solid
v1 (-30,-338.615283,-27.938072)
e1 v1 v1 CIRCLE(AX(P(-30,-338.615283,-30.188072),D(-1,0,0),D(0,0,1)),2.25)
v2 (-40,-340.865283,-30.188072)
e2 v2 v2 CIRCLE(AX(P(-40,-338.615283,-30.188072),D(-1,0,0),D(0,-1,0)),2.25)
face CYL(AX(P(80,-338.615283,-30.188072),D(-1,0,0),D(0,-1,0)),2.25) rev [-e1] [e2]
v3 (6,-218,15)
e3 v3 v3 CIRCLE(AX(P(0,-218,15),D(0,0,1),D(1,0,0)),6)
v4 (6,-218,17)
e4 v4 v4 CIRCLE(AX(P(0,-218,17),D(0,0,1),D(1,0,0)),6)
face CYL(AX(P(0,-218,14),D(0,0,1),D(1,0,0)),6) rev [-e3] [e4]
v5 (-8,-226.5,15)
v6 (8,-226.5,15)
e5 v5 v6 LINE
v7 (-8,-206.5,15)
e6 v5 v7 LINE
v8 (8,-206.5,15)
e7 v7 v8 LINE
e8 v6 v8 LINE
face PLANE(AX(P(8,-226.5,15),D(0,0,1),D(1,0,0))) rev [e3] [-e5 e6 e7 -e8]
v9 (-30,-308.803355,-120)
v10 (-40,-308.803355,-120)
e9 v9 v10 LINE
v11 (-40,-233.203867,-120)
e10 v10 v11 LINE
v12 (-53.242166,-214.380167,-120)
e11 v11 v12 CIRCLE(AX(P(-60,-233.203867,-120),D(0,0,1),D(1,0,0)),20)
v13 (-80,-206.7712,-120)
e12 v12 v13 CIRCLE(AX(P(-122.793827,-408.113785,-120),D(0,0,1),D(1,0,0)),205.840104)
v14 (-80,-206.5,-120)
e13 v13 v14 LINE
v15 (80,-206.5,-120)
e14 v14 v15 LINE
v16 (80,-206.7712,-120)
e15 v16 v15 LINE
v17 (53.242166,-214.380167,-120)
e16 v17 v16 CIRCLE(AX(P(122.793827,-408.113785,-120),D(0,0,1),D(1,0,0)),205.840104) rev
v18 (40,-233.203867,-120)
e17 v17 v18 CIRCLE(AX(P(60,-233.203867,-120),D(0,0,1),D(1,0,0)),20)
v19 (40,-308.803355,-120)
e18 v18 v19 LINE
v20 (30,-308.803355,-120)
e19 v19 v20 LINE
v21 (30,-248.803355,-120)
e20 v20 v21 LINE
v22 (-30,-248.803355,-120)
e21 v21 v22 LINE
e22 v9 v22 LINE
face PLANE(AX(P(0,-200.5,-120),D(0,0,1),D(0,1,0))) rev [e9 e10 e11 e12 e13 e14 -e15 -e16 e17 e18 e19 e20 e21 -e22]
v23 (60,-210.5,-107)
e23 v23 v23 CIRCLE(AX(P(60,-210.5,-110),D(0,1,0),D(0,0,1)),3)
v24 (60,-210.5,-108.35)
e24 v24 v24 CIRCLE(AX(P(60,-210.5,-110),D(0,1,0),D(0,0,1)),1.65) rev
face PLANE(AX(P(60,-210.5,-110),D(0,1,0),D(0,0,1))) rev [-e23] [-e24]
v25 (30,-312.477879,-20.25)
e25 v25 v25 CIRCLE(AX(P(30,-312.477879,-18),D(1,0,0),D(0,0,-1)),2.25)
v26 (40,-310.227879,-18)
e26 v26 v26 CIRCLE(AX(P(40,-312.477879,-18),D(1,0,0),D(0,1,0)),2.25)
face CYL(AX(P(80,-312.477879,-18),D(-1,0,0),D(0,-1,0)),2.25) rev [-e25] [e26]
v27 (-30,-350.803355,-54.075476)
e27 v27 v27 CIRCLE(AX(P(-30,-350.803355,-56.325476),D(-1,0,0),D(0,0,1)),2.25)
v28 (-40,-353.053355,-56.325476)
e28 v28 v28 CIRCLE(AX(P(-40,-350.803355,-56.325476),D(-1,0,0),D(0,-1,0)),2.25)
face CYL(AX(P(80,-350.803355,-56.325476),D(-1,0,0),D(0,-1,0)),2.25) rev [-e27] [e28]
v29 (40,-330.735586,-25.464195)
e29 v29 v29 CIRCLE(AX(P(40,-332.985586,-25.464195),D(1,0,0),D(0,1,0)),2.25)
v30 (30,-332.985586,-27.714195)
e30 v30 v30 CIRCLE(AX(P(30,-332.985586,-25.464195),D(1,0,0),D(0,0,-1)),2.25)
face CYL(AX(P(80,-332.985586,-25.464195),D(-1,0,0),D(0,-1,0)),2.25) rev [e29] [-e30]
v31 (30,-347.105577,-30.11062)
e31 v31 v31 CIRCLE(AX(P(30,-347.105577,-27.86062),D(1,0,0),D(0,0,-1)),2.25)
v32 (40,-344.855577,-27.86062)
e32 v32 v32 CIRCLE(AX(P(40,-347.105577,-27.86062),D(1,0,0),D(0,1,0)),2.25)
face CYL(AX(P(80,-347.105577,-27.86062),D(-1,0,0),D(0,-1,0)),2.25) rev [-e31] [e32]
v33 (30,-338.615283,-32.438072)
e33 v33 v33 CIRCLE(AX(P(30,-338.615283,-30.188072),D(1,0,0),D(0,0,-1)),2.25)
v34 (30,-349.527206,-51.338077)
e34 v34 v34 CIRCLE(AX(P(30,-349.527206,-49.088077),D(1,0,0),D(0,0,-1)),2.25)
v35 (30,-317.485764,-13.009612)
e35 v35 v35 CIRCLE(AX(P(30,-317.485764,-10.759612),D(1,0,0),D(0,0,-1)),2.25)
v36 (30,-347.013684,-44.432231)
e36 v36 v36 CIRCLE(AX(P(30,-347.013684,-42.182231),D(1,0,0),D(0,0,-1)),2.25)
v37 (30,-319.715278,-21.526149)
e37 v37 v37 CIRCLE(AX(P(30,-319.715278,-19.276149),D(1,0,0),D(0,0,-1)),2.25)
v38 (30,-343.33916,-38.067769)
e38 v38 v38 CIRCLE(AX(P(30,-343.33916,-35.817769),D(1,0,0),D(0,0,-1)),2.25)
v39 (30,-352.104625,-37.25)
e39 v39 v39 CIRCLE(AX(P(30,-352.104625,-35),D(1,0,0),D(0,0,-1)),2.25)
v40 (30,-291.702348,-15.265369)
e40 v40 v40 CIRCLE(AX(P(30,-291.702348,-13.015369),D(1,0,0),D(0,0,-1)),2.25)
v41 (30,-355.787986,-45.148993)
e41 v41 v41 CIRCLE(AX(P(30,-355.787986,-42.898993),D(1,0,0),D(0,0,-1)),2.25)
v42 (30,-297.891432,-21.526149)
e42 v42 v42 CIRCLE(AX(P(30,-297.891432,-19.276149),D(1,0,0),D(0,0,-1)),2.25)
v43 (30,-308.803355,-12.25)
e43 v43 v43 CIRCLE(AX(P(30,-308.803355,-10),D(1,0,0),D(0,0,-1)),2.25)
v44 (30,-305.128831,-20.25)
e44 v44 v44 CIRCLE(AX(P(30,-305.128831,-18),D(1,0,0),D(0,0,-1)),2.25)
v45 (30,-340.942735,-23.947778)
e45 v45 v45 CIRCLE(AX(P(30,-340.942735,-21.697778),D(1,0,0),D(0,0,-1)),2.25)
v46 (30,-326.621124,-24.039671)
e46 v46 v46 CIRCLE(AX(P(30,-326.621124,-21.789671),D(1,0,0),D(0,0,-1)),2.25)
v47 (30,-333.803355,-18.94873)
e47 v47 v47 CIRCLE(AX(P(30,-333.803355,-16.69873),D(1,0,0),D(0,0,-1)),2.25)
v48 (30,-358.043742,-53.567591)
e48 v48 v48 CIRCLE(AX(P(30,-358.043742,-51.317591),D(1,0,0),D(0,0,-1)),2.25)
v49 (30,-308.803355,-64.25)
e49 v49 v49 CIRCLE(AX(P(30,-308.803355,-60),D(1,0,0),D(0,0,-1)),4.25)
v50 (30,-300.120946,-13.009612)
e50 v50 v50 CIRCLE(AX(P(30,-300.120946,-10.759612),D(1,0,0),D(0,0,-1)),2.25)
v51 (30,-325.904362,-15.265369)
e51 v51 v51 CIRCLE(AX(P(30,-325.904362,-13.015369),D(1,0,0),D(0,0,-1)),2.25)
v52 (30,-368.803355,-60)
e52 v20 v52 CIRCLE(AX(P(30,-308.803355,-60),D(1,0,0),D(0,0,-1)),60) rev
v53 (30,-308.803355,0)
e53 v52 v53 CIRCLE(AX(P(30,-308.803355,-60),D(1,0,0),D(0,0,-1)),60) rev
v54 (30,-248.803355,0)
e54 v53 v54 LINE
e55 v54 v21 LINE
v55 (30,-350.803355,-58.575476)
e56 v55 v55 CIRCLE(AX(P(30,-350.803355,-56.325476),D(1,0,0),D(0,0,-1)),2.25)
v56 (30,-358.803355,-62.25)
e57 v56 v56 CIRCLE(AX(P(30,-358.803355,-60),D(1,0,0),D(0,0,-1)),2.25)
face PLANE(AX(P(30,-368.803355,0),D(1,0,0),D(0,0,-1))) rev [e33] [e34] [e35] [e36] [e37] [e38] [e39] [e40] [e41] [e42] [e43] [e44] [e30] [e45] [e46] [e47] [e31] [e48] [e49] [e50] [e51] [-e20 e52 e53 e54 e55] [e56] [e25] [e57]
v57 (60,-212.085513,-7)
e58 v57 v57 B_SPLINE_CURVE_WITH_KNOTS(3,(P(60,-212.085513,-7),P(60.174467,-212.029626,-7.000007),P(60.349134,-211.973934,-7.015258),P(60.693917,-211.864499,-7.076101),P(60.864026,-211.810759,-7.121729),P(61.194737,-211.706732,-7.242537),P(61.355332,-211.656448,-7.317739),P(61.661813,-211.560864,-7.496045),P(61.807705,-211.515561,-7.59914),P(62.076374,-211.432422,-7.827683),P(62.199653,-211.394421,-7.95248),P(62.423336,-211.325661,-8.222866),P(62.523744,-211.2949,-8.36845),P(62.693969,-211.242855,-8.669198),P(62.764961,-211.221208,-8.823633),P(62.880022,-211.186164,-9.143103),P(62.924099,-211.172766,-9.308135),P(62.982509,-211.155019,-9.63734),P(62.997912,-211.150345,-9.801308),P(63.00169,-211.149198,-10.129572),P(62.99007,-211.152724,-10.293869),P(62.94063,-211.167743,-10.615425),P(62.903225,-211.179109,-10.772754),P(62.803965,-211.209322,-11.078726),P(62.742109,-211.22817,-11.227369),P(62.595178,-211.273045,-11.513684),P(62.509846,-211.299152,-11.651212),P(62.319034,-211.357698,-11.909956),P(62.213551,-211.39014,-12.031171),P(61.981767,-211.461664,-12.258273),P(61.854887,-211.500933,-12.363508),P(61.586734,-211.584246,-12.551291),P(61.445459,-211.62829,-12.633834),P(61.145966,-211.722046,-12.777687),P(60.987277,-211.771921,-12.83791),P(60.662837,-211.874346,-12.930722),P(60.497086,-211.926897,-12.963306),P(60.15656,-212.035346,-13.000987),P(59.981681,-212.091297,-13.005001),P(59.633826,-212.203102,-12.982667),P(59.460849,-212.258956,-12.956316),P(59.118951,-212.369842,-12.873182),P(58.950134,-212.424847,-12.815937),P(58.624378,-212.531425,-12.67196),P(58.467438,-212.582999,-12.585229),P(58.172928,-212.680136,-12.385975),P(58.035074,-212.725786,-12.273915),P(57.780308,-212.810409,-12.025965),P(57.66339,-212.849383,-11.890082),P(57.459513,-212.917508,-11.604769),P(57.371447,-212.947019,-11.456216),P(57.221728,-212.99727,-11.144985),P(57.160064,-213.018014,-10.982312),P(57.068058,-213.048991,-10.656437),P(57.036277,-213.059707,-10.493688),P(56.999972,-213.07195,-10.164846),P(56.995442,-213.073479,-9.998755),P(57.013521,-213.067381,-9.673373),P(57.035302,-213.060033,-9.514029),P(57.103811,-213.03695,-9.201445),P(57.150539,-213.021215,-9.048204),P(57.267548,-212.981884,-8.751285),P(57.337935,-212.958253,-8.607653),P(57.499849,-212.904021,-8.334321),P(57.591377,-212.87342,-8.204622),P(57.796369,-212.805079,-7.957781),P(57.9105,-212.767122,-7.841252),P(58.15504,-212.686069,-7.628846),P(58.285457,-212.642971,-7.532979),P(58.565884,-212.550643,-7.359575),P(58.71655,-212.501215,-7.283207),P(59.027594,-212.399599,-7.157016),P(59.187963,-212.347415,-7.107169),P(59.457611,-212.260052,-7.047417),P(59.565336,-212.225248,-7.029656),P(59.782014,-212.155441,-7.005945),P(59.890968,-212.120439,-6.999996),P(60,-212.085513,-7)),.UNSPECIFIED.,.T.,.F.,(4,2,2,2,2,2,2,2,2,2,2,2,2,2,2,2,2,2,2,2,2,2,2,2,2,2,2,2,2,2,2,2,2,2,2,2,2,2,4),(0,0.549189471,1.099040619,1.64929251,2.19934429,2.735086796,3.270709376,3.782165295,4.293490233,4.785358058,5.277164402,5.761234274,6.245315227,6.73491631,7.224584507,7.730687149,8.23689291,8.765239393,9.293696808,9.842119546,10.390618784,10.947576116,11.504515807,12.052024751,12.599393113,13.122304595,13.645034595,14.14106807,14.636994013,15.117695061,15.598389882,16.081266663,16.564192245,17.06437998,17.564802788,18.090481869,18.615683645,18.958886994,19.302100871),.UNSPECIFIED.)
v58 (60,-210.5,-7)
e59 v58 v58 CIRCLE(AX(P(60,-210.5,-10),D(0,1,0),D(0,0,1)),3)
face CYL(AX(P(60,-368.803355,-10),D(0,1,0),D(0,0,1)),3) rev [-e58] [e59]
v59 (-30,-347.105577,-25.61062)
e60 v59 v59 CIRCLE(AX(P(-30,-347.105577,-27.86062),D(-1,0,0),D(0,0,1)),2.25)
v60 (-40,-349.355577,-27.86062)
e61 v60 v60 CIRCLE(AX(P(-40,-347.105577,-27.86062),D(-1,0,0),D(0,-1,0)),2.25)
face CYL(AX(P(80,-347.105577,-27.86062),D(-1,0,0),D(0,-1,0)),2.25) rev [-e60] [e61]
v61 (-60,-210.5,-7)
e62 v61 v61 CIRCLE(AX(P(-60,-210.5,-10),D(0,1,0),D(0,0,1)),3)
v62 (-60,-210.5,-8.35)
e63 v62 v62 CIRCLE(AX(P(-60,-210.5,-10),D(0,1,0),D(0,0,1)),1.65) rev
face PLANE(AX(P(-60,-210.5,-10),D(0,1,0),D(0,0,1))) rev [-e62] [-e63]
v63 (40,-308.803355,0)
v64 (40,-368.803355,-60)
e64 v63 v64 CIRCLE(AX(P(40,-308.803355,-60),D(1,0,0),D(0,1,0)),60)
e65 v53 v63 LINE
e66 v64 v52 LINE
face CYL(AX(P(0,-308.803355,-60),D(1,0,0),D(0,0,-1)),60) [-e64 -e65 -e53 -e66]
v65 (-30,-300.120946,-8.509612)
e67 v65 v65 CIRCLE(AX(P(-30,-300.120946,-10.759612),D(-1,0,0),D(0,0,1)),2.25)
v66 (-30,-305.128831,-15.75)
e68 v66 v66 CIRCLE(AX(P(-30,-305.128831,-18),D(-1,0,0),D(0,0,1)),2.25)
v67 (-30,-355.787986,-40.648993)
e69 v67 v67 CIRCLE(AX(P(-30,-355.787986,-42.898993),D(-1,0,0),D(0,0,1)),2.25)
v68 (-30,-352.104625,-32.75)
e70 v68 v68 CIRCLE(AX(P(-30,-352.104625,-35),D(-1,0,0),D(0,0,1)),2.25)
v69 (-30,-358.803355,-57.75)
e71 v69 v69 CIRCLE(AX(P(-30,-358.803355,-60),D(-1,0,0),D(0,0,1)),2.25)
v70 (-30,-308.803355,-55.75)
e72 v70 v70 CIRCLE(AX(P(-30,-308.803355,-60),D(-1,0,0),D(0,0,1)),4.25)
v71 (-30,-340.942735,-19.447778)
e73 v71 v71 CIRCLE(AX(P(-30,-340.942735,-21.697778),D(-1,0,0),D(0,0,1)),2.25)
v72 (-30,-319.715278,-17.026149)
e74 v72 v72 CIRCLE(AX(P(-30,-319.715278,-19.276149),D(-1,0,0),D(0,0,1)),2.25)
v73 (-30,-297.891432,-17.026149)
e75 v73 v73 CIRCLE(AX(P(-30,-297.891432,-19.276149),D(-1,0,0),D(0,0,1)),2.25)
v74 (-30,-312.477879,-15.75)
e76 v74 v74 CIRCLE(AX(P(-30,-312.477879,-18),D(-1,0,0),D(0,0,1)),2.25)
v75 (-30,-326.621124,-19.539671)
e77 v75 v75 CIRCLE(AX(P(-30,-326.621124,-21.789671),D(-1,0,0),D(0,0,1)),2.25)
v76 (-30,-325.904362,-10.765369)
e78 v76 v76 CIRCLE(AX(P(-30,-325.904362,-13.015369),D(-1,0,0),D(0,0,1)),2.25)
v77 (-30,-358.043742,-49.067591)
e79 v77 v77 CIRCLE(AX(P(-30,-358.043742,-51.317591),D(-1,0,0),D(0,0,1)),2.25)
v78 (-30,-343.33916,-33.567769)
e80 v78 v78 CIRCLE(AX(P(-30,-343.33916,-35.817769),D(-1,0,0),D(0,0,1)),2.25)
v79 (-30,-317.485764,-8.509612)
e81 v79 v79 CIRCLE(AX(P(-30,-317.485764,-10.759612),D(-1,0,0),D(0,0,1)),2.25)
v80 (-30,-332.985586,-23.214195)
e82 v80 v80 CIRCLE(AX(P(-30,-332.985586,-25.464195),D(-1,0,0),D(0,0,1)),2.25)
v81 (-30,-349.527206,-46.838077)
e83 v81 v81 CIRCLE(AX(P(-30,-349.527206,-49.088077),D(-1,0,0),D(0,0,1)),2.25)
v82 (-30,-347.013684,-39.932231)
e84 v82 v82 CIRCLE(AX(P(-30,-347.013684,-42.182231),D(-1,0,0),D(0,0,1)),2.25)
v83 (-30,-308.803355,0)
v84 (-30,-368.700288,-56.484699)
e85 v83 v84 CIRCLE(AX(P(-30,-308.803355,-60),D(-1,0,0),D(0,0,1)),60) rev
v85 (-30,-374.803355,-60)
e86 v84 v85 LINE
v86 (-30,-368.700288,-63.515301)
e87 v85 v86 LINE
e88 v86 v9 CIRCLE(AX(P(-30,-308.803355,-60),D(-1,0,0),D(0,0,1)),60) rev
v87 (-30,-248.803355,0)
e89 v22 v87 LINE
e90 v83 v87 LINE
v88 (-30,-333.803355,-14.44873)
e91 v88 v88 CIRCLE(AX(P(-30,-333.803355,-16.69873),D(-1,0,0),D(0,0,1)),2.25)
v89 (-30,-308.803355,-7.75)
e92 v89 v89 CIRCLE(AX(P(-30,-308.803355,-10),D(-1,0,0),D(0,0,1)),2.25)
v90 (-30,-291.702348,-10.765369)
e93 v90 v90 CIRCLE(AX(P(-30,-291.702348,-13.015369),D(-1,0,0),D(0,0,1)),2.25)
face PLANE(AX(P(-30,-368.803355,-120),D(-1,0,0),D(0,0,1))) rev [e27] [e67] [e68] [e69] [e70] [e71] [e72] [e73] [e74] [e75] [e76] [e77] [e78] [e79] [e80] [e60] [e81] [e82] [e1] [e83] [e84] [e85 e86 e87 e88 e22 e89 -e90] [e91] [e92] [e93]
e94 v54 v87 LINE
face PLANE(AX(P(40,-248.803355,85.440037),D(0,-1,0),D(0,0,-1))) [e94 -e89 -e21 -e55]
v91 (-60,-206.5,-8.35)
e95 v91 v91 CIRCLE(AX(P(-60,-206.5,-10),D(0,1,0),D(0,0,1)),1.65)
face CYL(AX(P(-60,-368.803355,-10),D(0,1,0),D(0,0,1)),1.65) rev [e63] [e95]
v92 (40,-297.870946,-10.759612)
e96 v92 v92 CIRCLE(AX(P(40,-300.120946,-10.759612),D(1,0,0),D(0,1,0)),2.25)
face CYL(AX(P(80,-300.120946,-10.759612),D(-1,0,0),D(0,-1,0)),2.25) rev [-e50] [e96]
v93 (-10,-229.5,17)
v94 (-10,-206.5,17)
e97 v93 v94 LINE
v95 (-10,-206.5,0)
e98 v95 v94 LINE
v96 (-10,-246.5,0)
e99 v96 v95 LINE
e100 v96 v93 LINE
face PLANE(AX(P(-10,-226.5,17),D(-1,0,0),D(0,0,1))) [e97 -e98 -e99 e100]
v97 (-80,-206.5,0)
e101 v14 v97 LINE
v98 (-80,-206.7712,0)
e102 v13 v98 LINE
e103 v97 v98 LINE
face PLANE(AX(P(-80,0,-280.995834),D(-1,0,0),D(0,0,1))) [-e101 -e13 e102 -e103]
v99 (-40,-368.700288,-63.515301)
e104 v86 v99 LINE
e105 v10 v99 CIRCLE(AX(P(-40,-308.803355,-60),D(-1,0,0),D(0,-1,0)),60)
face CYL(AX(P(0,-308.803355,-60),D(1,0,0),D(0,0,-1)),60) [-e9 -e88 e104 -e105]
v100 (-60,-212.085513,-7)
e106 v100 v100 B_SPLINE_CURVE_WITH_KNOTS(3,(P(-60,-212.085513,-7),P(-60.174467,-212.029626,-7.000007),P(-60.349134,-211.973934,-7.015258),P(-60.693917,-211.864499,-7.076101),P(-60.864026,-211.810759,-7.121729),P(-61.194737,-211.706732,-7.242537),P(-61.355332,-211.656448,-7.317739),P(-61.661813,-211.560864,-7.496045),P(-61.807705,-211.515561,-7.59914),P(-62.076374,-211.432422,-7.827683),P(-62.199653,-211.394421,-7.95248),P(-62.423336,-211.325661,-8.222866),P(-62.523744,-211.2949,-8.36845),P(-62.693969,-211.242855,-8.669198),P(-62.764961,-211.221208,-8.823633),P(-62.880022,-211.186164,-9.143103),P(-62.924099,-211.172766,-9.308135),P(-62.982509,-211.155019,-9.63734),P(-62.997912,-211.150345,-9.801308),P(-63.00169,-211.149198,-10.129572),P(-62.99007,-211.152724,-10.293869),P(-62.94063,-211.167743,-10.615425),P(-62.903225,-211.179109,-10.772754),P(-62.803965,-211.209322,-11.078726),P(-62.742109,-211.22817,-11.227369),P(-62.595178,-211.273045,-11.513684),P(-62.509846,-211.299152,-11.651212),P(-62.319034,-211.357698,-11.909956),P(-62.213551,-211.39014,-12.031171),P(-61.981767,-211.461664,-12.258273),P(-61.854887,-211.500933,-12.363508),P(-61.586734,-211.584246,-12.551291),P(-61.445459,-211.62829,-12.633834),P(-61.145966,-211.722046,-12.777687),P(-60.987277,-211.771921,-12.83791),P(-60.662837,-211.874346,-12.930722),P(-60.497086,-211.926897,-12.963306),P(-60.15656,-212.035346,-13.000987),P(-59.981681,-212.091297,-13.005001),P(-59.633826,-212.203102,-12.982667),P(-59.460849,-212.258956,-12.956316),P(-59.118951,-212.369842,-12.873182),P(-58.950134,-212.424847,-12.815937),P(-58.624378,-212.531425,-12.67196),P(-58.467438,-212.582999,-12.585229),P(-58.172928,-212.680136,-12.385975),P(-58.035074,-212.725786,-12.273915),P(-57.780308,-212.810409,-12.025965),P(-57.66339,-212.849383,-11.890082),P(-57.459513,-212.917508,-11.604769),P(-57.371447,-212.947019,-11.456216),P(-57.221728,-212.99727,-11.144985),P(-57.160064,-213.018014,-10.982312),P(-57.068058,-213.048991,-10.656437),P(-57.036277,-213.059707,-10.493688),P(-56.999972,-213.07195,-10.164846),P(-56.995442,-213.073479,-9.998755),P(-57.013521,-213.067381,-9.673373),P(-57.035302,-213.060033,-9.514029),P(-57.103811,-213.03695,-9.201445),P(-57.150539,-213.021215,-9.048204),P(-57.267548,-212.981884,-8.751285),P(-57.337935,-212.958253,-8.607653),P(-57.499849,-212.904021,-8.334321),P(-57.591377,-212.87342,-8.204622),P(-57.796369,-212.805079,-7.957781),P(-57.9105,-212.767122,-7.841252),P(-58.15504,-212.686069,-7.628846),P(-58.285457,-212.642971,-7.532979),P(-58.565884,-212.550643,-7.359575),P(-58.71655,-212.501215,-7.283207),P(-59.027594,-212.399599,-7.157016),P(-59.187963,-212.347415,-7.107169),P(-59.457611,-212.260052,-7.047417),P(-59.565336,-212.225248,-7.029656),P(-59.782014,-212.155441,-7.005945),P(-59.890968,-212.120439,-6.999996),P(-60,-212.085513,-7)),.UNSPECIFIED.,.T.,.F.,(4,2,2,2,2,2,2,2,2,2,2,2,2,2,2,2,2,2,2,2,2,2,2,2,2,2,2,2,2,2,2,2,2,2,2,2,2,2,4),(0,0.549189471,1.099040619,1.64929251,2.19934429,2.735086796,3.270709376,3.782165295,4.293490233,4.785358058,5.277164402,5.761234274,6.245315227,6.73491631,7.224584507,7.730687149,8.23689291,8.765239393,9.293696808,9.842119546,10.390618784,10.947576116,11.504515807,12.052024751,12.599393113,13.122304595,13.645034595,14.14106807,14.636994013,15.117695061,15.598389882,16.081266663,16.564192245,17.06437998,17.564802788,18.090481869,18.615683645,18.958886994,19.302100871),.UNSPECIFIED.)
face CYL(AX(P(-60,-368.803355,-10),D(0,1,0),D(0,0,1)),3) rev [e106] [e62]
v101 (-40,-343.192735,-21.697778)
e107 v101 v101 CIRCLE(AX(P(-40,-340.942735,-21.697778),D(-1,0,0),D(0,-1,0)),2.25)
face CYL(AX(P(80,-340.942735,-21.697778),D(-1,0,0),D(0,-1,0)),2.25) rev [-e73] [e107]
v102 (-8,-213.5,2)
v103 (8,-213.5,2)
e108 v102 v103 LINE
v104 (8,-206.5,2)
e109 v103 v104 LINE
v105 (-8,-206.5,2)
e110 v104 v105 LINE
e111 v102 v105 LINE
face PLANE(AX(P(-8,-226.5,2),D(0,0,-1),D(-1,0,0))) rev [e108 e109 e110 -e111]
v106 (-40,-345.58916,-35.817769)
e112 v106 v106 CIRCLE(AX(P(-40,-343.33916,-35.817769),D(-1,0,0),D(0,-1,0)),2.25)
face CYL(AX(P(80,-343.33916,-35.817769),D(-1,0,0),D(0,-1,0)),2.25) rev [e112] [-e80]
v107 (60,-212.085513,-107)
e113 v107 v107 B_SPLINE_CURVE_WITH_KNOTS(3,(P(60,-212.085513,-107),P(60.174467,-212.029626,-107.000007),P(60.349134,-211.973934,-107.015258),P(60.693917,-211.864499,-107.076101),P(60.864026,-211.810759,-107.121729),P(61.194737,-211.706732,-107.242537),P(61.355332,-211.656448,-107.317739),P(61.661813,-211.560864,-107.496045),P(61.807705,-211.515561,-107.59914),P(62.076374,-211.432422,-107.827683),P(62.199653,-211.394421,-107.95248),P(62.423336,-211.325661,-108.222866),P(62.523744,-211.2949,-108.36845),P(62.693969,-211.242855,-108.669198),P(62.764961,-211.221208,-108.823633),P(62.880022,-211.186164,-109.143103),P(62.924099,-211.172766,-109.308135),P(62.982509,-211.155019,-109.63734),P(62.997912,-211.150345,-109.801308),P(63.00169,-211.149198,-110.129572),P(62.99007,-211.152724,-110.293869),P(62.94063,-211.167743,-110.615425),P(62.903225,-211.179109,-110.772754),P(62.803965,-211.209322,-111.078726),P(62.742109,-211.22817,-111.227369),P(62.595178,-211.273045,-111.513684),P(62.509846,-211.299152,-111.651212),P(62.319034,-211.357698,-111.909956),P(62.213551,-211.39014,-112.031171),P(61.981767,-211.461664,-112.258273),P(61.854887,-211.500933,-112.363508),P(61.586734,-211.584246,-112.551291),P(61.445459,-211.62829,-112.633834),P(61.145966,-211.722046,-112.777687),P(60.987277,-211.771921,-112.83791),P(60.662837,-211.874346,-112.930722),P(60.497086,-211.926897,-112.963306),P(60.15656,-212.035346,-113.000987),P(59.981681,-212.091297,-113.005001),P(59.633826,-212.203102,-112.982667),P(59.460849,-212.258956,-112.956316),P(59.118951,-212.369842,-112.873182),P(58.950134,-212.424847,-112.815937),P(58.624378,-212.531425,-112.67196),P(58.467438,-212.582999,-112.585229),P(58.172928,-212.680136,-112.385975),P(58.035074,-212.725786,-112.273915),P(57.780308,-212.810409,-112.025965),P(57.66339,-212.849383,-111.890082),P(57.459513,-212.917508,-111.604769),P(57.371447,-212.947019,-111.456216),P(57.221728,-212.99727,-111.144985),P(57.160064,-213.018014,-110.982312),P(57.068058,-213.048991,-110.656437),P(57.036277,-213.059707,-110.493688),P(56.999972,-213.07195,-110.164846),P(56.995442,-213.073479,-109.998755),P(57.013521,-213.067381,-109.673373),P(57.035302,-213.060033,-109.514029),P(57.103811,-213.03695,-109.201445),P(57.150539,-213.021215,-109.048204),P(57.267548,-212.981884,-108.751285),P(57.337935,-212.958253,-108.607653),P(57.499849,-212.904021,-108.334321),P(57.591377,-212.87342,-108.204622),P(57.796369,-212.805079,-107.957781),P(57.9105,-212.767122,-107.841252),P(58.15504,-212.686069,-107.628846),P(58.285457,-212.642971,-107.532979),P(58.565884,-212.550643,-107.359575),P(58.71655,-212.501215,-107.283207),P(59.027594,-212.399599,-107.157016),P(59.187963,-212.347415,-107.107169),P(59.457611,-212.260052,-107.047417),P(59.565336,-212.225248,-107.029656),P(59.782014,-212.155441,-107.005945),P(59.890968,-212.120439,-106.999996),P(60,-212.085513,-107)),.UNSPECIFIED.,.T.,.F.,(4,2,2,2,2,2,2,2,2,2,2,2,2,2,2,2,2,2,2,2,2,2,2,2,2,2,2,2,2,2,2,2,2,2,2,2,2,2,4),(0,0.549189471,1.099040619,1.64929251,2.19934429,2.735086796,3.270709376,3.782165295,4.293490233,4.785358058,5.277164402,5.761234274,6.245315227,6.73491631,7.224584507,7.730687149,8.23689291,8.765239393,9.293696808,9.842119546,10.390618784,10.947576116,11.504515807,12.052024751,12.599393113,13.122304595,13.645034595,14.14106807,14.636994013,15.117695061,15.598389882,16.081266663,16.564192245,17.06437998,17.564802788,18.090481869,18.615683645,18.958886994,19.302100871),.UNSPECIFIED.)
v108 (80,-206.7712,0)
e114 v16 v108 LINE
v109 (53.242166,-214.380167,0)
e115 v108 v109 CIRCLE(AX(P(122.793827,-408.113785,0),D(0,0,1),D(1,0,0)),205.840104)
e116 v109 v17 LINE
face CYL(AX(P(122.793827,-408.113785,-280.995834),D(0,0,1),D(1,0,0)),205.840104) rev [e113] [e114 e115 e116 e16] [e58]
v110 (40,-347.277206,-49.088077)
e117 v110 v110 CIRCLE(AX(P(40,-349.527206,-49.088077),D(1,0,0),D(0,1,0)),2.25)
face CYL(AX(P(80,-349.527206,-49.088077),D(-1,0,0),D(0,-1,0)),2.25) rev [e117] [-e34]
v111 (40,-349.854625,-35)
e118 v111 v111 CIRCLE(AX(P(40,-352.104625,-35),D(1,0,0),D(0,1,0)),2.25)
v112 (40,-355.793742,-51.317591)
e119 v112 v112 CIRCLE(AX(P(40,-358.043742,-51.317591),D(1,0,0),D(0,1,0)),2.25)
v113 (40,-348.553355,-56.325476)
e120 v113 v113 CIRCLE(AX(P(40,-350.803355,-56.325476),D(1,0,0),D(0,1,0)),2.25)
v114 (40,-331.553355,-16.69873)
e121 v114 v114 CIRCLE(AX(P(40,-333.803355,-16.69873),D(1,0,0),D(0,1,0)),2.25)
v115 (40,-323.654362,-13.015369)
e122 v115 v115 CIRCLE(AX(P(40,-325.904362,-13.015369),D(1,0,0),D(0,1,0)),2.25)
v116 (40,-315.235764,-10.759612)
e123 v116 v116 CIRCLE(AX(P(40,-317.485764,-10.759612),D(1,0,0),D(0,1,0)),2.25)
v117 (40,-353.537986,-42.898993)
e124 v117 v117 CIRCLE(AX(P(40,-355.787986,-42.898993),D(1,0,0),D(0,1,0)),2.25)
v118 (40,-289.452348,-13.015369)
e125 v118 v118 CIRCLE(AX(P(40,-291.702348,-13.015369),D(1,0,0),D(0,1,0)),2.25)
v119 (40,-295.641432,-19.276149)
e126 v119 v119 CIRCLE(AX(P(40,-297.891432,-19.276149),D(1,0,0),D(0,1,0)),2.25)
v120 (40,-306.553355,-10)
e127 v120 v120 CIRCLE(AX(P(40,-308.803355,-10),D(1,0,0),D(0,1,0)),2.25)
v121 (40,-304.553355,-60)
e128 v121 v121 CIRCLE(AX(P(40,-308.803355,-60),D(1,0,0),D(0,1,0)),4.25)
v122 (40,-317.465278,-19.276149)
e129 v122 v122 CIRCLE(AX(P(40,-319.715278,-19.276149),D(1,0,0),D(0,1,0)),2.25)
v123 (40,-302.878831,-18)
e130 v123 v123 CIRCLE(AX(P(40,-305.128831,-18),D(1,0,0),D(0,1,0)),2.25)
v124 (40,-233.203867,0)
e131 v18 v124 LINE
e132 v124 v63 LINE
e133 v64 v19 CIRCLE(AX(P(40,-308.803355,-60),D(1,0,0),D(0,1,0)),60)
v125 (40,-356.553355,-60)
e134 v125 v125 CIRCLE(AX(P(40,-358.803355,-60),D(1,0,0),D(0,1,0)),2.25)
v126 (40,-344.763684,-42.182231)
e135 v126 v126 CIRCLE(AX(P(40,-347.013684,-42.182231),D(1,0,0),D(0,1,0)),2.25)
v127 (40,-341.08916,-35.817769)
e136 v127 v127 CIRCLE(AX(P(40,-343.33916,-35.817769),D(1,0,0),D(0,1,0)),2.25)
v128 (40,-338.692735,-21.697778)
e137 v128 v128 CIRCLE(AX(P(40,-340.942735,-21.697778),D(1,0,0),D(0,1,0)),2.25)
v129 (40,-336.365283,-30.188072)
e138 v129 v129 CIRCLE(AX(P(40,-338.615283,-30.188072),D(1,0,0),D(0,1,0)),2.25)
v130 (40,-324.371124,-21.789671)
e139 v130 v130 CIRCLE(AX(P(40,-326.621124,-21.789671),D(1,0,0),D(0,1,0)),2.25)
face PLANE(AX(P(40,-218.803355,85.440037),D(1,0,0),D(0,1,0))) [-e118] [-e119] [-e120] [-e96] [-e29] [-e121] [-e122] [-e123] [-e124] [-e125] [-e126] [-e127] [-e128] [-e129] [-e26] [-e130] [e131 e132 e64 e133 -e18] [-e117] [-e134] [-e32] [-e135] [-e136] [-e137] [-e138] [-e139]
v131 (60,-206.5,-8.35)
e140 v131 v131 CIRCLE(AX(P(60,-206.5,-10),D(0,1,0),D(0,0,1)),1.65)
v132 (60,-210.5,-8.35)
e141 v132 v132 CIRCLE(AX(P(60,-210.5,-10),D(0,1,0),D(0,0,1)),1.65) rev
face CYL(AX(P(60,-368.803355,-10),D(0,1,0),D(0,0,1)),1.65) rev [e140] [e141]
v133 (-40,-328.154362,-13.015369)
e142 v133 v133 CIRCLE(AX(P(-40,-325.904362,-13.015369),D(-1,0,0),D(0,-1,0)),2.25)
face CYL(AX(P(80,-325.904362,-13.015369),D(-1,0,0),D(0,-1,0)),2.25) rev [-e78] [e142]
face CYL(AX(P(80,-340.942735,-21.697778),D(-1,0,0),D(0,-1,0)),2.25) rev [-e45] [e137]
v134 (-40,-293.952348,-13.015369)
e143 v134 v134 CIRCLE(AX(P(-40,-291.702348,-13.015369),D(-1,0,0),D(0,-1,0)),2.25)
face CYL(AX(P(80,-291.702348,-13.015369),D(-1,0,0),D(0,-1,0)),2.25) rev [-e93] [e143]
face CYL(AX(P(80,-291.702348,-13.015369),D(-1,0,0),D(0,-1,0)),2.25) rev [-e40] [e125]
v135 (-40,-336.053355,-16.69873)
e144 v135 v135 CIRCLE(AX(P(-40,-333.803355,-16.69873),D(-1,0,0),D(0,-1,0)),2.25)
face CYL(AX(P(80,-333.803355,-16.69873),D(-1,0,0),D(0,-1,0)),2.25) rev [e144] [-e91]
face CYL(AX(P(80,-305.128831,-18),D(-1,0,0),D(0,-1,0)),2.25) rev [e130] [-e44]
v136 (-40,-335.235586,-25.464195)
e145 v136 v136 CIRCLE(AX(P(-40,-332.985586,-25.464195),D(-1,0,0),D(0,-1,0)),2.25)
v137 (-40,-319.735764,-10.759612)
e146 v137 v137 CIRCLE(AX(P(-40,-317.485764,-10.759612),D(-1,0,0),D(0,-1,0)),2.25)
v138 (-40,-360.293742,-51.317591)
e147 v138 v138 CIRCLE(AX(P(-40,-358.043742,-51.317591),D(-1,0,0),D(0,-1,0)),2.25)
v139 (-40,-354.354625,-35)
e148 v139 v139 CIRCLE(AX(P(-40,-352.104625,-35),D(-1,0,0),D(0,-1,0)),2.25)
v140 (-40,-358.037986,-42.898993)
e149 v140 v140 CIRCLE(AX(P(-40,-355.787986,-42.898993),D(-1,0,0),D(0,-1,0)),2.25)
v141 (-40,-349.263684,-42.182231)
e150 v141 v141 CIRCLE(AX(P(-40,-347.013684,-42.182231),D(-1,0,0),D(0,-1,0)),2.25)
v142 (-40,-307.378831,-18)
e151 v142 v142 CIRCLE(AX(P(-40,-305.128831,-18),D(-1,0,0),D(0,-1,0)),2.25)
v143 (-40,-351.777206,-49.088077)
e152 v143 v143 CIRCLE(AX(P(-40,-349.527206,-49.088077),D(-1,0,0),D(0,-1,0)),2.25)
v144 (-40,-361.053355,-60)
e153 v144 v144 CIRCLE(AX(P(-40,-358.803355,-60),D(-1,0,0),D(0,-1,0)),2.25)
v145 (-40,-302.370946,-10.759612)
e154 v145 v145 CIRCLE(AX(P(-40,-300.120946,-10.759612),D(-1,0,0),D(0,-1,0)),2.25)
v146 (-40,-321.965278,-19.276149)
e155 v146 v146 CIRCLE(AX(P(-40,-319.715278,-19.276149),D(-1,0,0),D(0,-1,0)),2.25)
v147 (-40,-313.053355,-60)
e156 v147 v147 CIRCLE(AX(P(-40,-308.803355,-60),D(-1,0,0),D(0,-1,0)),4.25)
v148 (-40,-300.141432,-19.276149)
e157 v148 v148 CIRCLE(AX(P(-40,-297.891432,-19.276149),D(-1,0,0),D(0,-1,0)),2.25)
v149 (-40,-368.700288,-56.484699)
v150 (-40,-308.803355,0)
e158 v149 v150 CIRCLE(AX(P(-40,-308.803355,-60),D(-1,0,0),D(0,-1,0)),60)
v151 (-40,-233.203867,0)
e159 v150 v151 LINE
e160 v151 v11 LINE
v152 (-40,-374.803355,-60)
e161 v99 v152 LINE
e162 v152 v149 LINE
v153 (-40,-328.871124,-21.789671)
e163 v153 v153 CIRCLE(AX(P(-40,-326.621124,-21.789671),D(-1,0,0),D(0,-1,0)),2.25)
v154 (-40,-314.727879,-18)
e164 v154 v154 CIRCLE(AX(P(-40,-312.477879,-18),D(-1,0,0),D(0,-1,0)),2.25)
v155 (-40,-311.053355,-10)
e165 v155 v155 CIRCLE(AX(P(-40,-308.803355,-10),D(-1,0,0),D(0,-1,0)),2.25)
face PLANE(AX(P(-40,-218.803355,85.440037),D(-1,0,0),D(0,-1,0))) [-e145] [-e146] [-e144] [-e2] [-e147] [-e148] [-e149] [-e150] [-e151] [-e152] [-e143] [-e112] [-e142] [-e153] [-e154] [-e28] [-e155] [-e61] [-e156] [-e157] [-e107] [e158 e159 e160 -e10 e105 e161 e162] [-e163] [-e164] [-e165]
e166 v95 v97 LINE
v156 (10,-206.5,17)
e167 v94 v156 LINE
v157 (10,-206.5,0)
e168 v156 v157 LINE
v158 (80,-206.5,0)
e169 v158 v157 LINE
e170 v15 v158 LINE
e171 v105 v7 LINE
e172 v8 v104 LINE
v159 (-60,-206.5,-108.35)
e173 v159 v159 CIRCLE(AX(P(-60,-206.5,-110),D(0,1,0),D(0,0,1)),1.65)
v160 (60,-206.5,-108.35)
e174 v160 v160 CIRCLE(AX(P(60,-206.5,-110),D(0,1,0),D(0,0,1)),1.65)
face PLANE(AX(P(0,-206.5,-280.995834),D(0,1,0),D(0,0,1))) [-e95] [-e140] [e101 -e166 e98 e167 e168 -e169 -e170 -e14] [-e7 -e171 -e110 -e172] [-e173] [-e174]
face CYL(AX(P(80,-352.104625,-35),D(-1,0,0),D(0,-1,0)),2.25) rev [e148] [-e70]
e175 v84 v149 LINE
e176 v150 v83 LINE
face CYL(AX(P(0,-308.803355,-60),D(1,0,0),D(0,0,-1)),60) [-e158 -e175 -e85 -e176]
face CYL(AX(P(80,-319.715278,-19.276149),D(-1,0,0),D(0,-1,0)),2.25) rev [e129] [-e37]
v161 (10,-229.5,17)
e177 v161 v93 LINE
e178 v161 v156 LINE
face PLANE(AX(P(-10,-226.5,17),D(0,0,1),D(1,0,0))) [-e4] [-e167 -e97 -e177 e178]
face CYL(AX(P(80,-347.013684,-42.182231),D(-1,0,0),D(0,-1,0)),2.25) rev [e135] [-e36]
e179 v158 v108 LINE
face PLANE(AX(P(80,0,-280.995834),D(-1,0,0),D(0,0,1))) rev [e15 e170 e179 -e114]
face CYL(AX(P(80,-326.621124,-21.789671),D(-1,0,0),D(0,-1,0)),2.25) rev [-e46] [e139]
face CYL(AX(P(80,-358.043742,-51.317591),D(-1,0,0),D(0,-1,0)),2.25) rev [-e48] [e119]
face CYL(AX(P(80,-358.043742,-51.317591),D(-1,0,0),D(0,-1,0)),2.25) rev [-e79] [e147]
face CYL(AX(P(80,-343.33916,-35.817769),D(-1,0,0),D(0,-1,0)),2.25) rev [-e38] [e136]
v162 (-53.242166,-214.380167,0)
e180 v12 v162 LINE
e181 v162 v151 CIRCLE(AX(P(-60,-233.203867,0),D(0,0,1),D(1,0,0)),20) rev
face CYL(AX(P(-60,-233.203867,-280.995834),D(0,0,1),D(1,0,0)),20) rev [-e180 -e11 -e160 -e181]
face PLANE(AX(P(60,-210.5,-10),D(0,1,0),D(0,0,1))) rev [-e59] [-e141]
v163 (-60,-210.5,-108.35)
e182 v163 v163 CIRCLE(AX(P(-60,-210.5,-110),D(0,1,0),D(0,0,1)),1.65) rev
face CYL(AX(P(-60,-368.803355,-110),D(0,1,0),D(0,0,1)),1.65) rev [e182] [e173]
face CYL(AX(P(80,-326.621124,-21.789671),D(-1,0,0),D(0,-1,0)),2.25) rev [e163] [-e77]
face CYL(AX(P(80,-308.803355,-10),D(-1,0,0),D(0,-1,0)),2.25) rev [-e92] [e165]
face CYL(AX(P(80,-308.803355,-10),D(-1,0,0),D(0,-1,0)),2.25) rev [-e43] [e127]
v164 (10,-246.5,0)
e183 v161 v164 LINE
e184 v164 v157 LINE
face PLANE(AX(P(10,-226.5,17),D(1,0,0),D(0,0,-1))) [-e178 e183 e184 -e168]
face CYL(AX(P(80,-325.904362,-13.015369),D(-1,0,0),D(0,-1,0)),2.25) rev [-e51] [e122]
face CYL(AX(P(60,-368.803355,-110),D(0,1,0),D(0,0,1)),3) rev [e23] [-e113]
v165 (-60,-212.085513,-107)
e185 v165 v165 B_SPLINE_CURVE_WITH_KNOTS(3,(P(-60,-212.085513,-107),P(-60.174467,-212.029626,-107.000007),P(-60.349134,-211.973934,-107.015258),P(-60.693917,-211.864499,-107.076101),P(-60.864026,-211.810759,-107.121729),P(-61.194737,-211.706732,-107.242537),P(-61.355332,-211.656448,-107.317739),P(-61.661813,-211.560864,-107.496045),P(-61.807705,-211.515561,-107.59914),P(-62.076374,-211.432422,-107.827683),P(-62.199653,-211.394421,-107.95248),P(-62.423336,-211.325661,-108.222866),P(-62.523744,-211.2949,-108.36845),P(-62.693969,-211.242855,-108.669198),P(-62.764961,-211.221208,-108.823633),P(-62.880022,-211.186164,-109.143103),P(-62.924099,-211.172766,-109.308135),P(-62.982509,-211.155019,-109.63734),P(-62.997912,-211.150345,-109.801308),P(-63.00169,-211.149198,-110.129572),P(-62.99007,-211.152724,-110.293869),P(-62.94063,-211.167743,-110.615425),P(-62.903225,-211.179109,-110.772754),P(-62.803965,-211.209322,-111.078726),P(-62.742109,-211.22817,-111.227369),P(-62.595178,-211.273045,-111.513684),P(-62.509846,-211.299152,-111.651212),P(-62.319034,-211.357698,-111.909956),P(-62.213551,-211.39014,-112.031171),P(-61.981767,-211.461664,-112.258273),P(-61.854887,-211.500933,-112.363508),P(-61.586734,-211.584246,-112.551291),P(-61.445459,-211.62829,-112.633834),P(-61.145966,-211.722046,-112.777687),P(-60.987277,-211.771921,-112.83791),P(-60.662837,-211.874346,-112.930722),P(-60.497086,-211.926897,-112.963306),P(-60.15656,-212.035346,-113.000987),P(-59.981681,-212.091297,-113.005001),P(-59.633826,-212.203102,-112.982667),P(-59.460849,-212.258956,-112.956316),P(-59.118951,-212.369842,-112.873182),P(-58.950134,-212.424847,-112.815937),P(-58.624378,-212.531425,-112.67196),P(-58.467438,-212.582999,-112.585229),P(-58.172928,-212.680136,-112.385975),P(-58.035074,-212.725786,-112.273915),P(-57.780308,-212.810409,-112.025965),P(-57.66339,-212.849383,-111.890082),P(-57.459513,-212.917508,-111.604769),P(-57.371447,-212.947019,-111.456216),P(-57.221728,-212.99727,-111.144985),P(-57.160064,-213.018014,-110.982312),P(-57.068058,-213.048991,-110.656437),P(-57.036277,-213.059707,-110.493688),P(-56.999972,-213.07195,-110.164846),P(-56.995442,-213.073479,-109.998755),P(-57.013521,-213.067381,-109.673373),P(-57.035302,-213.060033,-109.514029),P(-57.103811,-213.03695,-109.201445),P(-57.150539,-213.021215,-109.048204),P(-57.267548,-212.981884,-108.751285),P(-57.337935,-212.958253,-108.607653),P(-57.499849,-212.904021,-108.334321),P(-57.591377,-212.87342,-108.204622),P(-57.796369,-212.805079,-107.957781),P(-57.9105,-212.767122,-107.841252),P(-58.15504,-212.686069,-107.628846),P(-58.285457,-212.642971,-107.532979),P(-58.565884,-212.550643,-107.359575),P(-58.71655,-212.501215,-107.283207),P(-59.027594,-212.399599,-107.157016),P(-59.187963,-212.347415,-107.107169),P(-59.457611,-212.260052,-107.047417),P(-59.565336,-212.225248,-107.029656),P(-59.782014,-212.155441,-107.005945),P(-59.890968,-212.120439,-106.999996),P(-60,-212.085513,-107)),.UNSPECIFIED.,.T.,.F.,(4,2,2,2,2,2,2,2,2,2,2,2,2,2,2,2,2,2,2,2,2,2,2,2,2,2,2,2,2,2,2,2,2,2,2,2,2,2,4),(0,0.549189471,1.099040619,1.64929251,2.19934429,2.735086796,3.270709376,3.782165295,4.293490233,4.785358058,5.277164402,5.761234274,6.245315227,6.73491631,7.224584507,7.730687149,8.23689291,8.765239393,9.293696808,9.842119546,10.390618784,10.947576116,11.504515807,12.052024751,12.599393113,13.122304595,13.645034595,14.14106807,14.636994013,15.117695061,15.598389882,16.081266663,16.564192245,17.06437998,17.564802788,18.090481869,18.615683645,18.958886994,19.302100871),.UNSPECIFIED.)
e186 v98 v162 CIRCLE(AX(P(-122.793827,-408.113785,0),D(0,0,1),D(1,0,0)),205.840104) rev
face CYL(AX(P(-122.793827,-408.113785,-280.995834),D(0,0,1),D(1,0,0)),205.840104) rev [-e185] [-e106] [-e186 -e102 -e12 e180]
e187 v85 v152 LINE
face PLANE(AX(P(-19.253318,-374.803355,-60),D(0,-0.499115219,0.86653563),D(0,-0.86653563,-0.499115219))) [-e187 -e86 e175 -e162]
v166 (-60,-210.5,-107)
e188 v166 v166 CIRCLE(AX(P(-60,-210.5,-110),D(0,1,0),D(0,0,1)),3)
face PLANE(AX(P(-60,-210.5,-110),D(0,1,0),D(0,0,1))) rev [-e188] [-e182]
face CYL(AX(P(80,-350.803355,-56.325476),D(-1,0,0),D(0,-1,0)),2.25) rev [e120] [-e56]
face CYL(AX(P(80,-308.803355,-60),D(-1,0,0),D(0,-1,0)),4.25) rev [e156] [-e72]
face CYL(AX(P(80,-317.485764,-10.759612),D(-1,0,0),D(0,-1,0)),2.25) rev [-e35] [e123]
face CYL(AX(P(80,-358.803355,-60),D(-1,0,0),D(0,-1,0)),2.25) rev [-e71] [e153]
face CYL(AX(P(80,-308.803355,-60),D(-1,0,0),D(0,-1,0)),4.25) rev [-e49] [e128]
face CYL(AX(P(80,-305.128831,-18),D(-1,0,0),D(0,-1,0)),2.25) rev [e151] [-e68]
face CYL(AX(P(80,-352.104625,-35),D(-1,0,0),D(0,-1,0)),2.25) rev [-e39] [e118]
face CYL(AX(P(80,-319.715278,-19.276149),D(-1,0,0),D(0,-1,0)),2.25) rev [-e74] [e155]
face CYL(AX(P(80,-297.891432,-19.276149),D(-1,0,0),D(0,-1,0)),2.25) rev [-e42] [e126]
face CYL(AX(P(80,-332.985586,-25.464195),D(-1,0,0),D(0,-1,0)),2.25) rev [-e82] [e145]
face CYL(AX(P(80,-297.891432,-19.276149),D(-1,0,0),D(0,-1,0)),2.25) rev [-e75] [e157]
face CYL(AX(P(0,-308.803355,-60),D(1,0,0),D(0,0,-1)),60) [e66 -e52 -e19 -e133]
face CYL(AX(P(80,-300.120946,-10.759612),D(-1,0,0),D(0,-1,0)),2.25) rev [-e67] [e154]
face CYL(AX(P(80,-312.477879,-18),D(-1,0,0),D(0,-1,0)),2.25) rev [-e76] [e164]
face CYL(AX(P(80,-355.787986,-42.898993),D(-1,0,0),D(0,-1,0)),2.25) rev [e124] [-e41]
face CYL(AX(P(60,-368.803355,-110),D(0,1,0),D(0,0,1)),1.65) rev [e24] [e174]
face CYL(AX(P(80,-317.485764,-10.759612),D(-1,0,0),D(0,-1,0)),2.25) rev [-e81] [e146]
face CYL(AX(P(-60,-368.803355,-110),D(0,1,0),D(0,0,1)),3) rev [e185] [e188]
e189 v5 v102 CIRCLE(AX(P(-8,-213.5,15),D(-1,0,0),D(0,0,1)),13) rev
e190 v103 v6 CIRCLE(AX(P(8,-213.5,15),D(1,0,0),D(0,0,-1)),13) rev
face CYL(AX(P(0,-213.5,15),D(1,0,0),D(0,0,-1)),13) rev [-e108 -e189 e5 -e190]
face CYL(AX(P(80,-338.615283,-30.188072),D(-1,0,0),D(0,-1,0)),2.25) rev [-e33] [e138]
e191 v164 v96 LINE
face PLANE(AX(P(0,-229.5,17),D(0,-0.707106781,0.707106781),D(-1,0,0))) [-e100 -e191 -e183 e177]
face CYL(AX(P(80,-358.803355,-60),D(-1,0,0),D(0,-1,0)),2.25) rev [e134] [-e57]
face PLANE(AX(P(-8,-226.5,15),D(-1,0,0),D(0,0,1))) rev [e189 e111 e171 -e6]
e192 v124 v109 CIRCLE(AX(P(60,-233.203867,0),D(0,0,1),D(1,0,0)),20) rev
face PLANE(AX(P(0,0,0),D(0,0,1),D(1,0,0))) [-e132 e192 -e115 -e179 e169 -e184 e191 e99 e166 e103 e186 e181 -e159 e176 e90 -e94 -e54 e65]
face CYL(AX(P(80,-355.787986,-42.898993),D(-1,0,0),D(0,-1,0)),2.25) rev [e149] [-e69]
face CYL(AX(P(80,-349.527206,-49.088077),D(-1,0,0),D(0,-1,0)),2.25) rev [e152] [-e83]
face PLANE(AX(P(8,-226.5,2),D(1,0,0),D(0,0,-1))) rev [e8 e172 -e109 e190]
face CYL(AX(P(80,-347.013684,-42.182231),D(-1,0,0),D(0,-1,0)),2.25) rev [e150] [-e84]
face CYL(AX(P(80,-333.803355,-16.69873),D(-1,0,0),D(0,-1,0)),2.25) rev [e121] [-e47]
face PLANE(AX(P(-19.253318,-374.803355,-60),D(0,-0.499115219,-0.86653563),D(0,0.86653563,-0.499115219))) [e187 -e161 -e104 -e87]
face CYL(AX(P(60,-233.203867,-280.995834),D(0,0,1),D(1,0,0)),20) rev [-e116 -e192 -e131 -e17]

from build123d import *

# Parameters (mm, degrees)
BOSS_EXTRUDE1_DEPTH = 120
SKETCH2_W           = 80
SKETCH2_H           = 30
BOSS_EXTRUDE2_DEPTH = 120
FILLET1_R           = 20
SKETCH3_W           = 10
SKETCH3_H           = 120
BOSS_EXTRUDE3_DEPTH = 120
FILLET2_R           = 60
SKETCH4_R           = 4.25
SKETCH4_R_2         = 2.25
CUT_EXTRUDE1_DEPTH  = 406.975263542
SKETCH6_W           = 20
SKETCH6_H           = 17
SKETCH6_W_2         = 16
SKETCH6_H_2         = 13
BOSS_EXTRUDE4_DEPTH = 20
SKETCH7_W           = 20
SKETCH7_H           = 17
BOSS_EXTRUDE5_DEPTH = 3
FILLET3_R           = 13
SKETCH8_R           = 6
CUT_EXTRUDE2_DEPTH  = 3
CHAMFER1_SIZE       = 17
SKETCH10_R          = 1.65
CUT_EXTRUDE3_DEPTH  = 218.122958345
SKETCH11_R          = 3
CUT_EXTRUDE4_DEPTH  = 215.149368903
BOSS_EXTRUDE6_DEPTH = 10


with BuildPart() as part:
    # Sketch1 → Boss-Extrude1 (new body)
    with BuildSketch(Plane.XY):
        with BuildLine():
            Line((80, -206.5), (-80, -206.5))
            Line((-80, -206.5), (-80, -206.771199773))
            ThreePointArc((-80, -206.771199773), (-65.350122978, -210.451524762), (-51.0095809, -215.196263078))
            ThreePointArc((-51.0095809, -215.196263078), (0, -224.378994833), (51.0095809, -215.196263078))
            ThreePointArc((51.0095809, -215.196263078), (65.350122978, -210.451524762), (80, -206.771199773))
            Line((80, -206.771199773), (80, -206.5))
        make_face()
    extrude(amount=-BOSS_EXTRUDE1_DEPTH)

    # Sketch2 → Boss-Extrude2 (add)
    with BuildSketch(Plane(origin=(0, 0, -120), x_dir=(-1, 0, 0), z_dir=(0, 0, -1))):
        with Locations((0, -233.803354766)):
            Rectangle(SKETCH2_W, SKETCH2_H)
    extrude(amount=-BOSS_EXTRUDE2_DEPTH)

    # Fillet1
    fillet1_edges = [part.edges().sort_by_distance(p)[0] for p in [
        (40, -218.803354766, -60),
        (-40, -218.803354766, -60),
    ]]
    fillet(fillet1_edges, radius=FILLET1_R)

    # Sketch3 → Boss-Extrude3 (add)
    with BuildSketch(Plane.XZ.offset(248.803354766)):
        with Locations((35, -60)):
            Rectangle(SKETCH3_W, SKETCH3_H)
        with Locations((-35, -60)):
            Rectangle(SKETCH3_W, SKETCH3_H)
    extrude(amount=BOSS_EXTRUDE3_DEPTH)

    # Fillet2
    fillet2_edges = [part.edges().sort_by_distance(p)[0] for p in [
        (35, -368.803354766, -120),
        (35, -368.803354766, 0),
        (-35, -368.803354766, 0),
        (-35, -368.803354766, -120),
    ]]
    fillet(fillet2_edges, radius=FILLET2_R - 0.0001)  # a hair under: the kernel refuses the full size

    # Sketch4 → Cut-Extrude1 (cut, through all)
    with BuildSketch(Plane.ZY.offset(40)):
        with Locations(Location((-60, -308.803354766, 0), (0, 0, 270))):
            Circle(SKETCH4_R)
        with Locations(Location((-60, -358.803354766, 0), (0, 0, 270))):
            Circle(SKETCH4_R_2)
        with Locations(Location((-51.317591117, -358.043742416, 0), (0, 0, 270))):
            Circle(SKETCH4_R_2)
        with Locations(Location((-42.898992834, -355.787985805, 0), (0, 0, 270))):
            Circle(SKETCH4_R_2)
        with Locations(Location((-35, -352.104624955, 0), (0, 0, 270))):
            Circle(SKETCH4_R_2)
        with Locations(Location((-27.860619516, -347.105576922, 0), (0, 0, 270))):
            Circle(SKETCH4_R_2)
        with Locations(Location((-21.697777844, -340.94273525, 0), (0, 0, 270))):
            Circle(SKETCH4_R_2)
        with Locations(Location((-16.698729811, -333.803354766, 0), (0, 0, 270))):
            Circle(SKETCH4_R_2)
        with Locations(Location((-13.015368961, -325.904361932, 0), (0, 0, 270))):
            Circle(SKETCH4_R_2)
        with Locations(Location((-10.759612349, -317.485763649, 0), (0, 0, 270))):
            Circle(SKETCH4_R_2)
        with Locations(Location((-10, -308.803354766, 0), (0, 0, 270))):
            Circle(SKETCH4_R_2)
        with Locations(Location((-10.759612349, -300.120945882, 0), (0, 0, 270))):
            Circle(SKETCH4_R_2)
        with Locations(Location((-13.015368961, -291.702347599, 0), (0, 0, 270))):
            Circle(SKETCH4_R_2)
        with Locations(Location((-56.325476132, -350.803354766, 0), (0, 0, 270))):
            Circle(SKETCH4_R_2)
        with Locations(Location((-49.088076944, -349.527206019, 0), (0, 0, 270))):
            Circle(SKETCH4_R_2)
        with Locations(Location((-42.182231017, -347.013683659, 0), (0, 0, 270))):
            Circle(SKETCH4_R_2)
        with Locations(Location((-35.817768983, -343.339159791, 0), (0, 0, 270))):
            Circle(SKETCH4_R_2)
        with Locations(Location((-30.188071803, -338.615282963, 0), (0, 0, 270))):
            Circle(SKETCH4_R_2)
        with Locations(Location((-25.464194975, -332.985585782, 0), (0, 0, 270))):
            Circle(SKETCH4_R_2)
        with Locations(Location((-21.789671107, -326.621123749, 0), (0, 0, 270))):
            Circle(SKETCH4_R_2)
        with Locations(Location((-19.276148747, -319.715277822, 0), (0, 0, 270))):
            Circle(SKETCH4_R_2)
        with Locations(Location((-18, -312.477878634, 0), (0, 0, 270))):
            Circle(SKETCH4_R_2)
        with Locations(Location((-18, -305.128830898, 0), (0, 0, 270))):
            Circle(SKETCH4_R_2)
        with Locations(Location((-19.276148747, -297.89143171, 0), (0, 0, 270))):
            Circle(SKETCH4_R_2)
    extrude(amount=-CUT_EXTRUDE1_DEPTH, mode=Mode.SUBTRACT)

    # Sketch6 → Boss-Extrude4 (add)
    with BuildSketch(Plane(origin=(0, -206.5, 0), x_dir=(1, 0, 0), z_dir=(0, 1, 0))):
        with Locations((0, -8.5)):
            Rectangle(SKETCH6_W, SKETCH6_H)
        with Locations((0, -8.5)):
            Rectangle(SKETCH6_W_2, SKETCH6_H_2, mode=Mode.SUBTRACT)
    extrude(amount=-BOSS_EXTRUDE4_DEPTH)

    # Sketch7 → Boss-Extrude5 (add)
    with BuildSketch(Plane.XZ.offset(226.5)):
        with Locations((0, 8.5)):
            Rectangle(SKETCH7_W, SKETCH7_H)
    extrude(amount=BOSS_EXTRUDE5_DEPTH)

    # Fillet3
    fillet3_edges = [part.edges().sort_by_distance(p)[0] for p in [
        (0, -226.5, 2),
    ]]
    fillet(fillet3_edges, radius=FILLET3_R - 0.0001)  # a hair under: the kernel refuses the full size

    # Sketch8 → Cut-Extrude2 (cut)
    with BuildSketch(Plane.XY.offset(17)):
        with Locations((0, -218)):
            Circle(SKETCH8_R)
    extrude(amount=-CUT_EXTRUDE2_DEPTH, mode=Mode.SUBTRACT)

    # Chamfer1
    chamfer1_edges = [part.edges().sort_by_distance(p)[0] for p in [
        (0, -229.5, 0),
    ]]
    chamfer(chamfer1_edges, length=CHAMFER1_SIZE - 0.0001)  # a hair under: the kernel refuses the full size

    # Sketch10 → Cut-Extrude3 (cut, through all)
    with BuildSketch(Plane(origin=(0, -206.5, 0), x_dir=(1, 0, 0), z_dir=(0, 1, 0))):
        with Locations(Location((-60, 110, 0), (0, 0, 270))):
            Circle(SKETCH10_R)
        with Locations(Location((-60, 10, 0), (0, 0, 270))):
            Circle(SKETCH10_R)
        with Locations(Location((60, 10, 0), (0, 0, 270))):
            Circle(SKETCH10_R)
        with Locations(Location((60, 110, 0), (0, 0, 270))):
            Circle(SKETCH10_R)
    extrude(amount=-CUT_EXTRUDE3_DEPTH, mode=Mode.SUBTRACT)

    # Sketch11 → Cut-Extrude4 (cut, through all)
    with BuildSketch(Plane(origin=(0, -210.5, 0), x_dir=(1, 0, 0), z_dir=(0, 1, 0))):
        with Locations(Location((-60, 110, 0), (0, 0, 270))):
            Circle(SKETCH11_R)
        with Locations(Location((-60, 10, 0), (0, 0, 270))):
            Circle(SKETCH11_R)
        with Locations(Location((60, 110, 0), (0, 0, 270))):
            Circle(SKETCH11_R)
        with Locations(Location((60, 10, 0), (0, 0, 270))):
            Circle(SKETCH11_R)
    extrude(amount=-CUT_EXTRUDE4_DEPTH, mode=Mode.SUBTRACT)

    # Sketch13 → Boss-Extrude6 (add)
    with BuildSketch(Plane.ZY.offset(40)):
        Polygon((-60, -374.803354766), (-63.515300685, -368.700288419), (-60, -366.67551297), (-56.484699315, -368.700288419), align=None)
    extrude(amount=-BOSS_EXTRUDE6_DEPTH)


solid = part.part
